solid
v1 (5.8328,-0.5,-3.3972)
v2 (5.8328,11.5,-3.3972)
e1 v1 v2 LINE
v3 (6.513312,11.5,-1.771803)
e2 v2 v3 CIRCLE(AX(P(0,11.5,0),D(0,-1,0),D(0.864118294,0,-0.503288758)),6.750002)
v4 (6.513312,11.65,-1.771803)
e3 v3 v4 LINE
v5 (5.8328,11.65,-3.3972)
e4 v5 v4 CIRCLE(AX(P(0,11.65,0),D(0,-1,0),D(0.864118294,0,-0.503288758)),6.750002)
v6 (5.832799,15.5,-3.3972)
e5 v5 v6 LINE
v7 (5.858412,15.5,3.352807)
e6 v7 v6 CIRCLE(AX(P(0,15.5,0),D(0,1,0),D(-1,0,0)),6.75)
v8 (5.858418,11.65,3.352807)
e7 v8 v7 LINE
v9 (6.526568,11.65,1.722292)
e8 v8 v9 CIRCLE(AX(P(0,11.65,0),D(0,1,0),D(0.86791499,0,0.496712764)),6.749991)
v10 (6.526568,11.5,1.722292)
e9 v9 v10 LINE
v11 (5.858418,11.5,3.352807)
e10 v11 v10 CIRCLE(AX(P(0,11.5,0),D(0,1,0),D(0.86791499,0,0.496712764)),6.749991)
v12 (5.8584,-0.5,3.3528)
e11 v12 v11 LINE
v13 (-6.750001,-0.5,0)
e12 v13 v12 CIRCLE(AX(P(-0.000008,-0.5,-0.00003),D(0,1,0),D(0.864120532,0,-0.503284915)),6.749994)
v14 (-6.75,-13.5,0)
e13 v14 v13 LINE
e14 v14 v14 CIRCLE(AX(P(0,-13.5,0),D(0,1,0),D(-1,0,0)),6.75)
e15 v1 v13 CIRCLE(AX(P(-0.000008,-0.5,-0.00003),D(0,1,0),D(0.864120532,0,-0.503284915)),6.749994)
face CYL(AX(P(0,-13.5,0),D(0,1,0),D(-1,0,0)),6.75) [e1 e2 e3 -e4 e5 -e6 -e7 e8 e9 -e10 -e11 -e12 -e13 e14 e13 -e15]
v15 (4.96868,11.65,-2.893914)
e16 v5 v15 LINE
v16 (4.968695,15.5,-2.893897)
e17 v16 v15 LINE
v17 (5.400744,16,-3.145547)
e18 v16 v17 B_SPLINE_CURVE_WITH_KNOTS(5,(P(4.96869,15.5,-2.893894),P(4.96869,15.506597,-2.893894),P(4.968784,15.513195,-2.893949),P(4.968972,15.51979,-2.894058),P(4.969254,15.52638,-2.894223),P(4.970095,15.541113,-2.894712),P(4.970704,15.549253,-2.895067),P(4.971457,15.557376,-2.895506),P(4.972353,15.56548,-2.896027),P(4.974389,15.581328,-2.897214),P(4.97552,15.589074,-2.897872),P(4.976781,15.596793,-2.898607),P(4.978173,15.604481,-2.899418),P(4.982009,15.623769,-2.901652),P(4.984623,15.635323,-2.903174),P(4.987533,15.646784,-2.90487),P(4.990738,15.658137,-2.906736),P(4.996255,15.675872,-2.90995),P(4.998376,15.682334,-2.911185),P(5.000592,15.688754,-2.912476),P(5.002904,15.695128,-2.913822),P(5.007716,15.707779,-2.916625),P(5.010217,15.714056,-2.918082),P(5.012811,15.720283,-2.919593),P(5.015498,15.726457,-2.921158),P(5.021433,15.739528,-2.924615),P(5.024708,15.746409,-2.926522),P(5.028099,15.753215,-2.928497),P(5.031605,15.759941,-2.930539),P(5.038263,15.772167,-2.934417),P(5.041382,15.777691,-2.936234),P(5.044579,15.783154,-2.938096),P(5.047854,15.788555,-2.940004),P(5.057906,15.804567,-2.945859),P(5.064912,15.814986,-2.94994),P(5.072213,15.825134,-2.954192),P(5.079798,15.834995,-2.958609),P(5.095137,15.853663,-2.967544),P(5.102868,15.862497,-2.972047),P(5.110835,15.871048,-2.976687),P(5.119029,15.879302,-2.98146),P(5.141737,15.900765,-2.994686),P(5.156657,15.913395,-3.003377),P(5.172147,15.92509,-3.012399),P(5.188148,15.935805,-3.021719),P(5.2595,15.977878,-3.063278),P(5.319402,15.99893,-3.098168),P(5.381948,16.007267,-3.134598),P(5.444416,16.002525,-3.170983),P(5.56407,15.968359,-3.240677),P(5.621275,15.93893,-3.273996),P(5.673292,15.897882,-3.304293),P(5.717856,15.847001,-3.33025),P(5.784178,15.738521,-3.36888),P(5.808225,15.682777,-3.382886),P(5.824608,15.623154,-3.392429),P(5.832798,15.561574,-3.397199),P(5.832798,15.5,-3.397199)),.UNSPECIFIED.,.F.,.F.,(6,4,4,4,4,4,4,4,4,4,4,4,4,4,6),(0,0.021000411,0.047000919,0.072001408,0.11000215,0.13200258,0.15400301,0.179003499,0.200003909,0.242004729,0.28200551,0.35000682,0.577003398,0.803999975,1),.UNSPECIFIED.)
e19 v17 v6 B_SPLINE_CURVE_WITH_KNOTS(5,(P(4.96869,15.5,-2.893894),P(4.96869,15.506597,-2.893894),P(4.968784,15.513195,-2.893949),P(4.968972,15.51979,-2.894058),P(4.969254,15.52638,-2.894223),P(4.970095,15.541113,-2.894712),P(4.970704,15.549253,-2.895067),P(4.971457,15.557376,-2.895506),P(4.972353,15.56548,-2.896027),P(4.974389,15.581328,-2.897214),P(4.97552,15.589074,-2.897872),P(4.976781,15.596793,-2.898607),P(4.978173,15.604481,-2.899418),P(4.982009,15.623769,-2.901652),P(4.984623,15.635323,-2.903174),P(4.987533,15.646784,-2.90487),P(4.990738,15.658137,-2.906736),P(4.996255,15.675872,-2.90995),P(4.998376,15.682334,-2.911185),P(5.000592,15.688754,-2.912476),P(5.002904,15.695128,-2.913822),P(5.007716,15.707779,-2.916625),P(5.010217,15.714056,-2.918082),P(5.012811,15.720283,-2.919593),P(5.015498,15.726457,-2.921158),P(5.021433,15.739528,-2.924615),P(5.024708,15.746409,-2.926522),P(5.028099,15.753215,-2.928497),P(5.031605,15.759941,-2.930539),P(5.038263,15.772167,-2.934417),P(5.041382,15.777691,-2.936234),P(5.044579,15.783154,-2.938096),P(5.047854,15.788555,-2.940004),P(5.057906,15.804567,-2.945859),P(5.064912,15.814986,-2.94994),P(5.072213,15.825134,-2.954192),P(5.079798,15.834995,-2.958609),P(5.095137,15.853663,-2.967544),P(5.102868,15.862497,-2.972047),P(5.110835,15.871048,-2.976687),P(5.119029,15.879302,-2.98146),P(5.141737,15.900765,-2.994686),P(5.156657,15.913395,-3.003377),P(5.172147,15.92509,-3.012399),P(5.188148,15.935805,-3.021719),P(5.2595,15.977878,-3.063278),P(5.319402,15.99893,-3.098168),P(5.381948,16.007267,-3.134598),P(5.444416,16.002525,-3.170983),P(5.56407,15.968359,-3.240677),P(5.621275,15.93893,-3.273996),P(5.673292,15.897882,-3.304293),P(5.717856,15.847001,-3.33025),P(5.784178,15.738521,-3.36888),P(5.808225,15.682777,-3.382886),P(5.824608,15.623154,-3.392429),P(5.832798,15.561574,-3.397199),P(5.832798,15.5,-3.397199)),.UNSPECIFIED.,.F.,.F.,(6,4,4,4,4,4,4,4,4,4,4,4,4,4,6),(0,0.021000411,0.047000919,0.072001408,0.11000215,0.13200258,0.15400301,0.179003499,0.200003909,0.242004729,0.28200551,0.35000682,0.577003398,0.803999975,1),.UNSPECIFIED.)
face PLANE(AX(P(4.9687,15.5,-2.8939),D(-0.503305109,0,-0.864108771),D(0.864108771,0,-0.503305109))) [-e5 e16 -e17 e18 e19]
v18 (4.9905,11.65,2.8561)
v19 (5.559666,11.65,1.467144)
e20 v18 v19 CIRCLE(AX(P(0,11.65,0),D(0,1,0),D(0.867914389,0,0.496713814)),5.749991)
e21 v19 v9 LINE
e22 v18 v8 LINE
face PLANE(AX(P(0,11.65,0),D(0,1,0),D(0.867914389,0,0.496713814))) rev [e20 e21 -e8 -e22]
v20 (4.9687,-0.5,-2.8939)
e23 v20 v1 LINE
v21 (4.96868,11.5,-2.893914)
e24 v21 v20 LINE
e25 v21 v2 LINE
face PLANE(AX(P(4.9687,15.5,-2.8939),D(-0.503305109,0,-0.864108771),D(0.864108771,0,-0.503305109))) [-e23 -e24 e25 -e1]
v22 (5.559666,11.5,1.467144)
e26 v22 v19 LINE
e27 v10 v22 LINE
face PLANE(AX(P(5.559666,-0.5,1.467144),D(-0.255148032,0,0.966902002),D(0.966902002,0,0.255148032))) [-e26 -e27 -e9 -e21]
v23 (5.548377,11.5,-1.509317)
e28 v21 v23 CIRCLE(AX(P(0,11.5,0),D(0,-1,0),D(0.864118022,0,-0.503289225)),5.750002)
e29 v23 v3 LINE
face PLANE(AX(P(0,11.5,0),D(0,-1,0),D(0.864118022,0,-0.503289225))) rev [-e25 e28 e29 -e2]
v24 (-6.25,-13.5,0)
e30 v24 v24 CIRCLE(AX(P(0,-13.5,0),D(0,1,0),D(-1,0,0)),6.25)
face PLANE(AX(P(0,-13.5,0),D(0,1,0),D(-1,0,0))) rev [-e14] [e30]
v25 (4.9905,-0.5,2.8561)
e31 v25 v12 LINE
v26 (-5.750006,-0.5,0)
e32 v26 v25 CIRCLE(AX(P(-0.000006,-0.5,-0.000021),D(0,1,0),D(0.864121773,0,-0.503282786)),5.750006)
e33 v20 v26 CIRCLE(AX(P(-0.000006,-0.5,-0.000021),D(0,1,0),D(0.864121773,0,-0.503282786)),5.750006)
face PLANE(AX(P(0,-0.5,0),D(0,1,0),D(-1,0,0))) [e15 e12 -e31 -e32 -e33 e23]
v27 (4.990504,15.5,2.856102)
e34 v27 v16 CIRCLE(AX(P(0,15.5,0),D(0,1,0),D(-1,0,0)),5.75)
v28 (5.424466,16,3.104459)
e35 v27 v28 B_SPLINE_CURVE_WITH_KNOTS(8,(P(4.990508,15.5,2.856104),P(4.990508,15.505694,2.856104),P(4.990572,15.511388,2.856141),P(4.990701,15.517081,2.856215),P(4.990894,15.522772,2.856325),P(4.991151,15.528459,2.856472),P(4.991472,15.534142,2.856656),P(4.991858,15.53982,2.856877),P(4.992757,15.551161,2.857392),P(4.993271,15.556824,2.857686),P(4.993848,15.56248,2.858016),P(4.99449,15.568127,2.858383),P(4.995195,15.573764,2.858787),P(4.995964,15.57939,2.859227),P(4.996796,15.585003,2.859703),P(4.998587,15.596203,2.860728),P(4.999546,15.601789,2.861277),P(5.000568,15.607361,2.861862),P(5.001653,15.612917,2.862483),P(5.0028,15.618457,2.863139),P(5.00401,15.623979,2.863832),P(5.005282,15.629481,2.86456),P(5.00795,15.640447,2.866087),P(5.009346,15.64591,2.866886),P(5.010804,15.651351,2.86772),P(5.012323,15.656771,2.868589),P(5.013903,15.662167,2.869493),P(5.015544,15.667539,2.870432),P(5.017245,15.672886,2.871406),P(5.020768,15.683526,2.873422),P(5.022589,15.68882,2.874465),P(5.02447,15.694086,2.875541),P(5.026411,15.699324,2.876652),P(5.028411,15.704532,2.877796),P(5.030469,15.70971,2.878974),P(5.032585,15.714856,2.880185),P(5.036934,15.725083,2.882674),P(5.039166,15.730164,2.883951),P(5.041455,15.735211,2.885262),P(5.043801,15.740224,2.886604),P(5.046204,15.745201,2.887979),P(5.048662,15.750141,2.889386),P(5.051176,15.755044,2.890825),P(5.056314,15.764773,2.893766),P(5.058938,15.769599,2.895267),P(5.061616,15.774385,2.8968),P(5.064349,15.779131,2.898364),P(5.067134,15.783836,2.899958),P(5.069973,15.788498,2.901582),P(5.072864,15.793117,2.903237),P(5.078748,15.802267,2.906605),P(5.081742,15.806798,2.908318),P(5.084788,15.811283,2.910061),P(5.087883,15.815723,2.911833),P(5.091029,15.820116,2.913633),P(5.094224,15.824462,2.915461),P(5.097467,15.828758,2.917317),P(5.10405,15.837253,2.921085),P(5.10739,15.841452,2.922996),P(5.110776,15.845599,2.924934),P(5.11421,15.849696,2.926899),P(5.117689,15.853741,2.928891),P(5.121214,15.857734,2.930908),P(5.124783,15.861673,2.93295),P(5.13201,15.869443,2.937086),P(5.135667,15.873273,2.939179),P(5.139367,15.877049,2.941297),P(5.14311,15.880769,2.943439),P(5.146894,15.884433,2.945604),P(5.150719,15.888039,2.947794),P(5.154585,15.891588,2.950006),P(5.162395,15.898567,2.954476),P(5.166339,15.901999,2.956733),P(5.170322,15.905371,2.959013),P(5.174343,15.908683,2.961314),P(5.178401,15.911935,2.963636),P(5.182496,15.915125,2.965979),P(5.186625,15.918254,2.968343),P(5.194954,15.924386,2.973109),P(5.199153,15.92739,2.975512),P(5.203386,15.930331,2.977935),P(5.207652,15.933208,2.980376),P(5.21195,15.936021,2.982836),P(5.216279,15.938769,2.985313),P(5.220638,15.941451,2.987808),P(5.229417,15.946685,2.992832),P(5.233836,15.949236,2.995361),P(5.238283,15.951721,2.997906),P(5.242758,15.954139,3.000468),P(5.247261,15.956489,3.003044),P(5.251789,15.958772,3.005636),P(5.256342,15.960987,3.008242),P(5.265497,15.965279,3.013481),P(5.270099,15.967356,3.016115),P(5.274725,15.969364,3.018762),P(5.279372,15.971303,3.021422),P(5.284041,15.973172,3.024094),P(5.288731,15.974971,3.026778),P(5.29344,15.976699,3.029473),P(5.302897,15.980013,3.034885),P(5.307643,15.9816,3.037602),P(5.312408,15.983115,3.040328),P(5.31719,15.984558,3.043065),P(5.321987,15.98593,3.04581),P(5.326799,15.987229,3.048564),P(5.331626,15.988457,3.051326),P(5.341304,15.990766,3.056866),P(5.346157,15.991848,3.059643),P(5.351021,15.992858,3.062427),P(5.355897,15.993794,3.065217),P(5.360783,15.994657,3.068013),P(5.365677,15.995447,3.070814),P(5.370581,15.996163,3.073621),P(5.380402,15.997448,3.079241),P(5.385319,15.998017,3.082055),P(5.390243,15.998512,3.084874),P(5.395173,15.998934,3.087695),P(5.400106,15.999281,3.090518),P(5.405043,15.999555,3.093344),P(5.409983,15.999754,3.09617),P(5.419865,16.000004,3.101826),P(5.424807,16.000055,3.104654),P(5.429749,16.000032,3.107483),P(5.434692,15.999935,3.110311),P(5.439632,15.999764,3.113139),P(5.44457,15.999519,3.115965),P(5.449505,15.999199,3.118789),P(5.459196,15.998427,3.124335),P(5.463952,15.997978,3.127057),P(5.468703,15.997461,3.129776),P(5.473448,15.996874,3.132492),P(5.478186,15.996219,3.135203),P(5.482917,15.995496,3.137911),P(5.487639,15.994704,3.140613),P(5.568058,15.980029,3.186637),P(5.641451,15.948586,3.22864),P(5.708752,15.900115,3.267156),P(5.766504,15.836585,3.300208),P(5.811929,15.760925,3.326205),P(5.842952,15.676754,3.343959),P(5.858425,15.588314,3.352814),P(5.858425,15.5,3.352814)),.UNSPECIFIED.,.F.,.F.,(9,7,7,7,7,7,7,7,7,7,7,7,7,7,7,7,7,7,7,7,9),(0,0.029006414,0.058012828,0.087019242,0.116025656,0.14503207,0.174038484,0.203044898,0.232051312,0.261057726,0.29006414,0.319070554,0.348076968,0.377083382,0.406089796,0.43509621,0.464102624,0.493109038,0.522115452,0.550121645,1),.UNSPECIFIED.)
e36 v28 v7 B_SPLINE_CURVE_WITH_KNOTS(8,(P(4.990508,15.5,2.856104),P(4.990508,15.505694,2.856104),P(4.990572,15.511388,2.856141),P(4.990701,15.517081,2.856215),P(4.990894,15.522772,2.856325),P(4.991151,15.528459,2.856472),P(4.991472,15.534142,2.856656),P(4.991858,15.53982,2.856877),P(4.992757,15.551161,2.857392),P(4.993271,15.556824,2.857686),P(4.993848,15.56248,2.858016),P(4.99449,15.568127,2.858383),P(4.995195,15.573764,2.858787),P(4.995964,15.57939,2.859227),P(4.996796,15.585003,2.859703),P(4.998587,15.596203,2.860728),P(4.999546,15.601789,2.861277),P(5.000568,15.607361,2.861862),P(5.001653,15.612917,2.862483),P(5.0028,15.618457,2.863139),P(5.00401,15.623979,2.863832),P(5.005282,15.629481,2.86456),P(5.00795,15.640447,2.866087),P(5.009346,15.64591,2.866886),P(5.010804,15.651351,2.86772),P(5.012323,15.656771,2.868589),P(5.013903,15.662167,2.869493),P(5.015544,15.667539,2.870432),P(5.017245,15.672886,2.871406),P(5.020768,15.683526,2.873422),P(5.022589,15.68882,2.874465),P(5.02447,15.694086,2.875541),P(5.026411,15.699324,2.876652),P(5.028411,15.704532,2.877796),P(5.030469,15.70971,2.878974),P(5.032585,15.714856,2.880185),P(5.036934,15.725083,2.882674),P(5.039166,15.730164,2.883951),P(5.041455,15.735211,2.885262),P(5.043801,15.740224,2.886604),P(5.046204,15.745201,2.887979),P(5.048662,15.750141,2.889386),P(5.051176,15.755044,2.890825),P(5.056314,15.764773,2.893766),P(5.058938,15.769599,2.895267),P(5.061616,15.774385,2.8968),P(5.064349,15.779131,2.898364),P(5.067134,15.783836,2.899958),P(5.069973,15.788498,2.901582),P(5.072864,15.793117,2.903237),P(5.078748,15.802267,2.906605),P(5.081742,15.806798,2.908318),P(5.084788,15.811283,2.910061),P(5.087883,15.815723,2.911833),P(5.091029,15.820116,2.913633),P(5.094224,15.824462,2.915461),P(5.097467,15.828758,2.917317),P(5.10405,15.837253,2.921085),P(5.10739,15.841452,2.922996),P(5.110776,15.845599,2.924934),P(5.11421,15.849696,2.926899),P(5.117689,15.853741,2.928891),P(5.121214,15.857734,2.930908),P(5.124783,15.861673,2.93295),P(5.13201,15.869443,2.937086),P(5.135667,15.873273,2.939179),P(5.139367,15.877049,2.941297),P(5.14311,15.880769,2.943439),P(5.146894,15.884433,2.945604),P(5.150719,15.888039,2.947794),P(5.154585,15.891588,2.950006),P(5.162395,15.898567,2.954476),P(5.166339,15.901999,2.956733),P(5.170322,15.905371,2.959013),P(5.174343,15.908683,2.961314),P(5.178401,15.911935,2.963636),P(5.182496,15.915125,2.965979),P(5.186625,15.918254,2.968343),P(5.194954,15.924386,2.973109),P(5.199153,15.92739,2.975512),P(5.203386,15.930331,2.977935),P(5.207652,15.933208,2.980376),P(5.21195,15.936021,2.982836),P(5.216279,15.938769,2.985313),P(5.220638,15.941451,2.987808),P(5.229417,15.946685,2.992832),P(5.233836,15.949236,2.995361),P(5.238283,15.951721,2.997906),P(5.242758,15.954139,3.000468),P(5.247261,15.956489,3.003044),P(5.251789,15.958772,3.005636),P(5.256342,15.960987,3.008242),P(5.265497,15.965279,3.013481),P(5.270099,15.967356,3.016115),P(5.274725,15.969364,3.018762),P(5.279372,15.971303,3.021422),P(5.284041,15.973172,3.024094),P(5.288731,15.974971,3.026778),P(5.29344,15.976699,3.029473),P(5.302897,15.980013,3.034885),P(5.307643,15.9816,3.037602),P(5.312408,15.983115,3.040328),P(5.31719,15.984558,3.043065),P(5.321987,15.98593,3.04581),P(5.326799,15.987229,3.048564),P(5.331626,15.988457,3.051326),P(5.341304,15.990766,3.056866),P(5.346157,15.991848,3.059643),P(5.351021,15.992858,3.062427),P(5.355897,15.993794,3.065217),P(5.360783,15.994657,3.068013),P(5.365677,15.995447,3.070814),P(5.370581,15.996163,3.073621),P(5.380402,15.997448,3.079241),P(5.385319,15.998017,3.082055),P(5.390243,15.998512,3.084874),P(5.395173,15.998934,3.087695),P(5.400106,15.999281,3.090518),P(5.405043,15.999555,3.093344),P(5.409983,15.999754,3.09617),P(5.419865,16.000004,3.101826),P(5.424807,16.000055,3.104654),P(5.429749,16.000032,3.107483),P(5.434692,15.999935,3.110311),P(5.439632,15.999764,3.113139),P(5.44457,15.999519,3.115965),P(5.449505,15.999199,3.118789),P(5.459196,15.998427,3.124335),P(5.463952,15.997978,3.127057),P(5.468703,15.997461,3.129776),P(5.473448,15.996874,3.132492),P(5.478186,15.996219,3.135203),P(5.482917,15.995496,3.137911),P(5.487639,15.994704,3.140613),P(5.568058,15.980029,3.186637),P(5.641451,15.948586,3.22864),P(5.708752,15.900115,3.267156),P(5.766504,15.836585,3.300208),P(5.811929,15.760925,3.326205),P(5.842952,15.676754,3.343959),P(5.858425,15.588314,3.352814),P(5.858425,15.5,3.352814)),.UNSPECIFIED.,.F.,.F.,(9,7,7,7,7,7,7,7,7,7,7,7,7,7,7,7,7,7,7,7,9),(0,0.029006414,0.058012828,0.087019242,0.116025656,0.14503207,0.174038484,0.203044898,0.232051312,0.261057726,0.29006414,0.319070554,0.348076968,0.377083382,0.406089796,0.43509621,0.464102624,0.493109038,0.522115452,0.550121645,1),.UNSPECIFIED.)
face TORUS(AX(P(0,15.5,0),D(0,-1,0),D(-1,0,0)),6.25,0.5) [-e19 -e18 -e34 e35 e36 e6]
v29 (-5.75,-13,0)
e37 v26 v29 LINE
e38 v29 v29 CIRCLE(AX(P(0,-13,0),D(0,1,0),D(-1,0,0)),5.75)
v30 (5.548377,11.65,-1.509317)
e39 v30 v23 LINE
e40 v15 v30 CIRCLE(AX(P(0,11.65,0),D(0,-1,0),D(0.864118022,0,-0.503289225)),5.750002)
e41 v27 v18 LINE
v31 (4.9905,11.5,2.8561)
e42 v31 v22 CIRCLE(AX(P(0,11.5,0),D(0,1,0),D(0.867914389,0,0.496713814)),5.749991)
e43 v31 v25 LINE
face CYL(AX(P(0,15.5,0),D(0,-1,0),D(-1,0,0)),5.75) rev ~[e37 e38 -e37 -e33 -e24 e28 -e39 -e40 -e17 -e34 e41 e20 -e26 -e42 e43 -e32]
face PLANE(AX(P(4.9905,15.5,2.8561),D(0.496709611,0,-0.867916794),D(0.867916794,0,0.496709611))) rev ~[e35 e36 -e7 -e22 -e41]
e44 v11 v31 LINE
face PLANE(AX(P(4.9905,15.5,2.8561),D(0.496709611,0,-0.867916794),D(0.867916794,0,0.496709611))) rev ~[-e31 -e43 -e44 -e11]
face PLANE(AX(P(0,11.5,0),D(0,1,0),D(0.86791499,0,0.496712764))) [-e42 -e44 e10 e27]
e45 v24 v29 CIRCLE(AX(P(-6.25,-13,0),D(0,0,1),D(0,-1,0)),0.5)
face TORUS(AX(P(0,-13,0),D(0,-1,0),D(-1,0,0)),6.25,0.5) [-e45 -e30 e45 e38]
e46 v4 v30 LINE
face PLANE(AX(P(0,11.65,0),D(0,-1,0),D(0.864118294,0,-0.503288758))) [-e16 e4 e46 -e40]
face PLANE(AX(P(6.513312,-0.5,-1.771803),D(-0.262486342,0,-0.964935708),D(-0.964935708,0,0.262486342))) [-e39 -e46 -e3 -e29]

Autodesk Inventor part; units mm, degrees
sketch "Sketch1" plane through (0, 0, 0) normal (0, 0, 1) x (1, 0, 0)
  line L0 (-6.25, -13.5) -> (-6.75, -13.5)
  line L1 (-6.75, -13.5) -> (-6.75, 15.5)
  line L2 (-6.25, 16) -> (-6.25, 16)
  line L3 (-5.75, 15.5) -> (-5.75, -13)
  arc A0 (-6.25, -13.5) -> (-5.75, -13) centre (-6.25, -13) ccw
  arc A1 (-6.25, 16) -> (-6.75, 15.5) centre (-6.25, 15.5) ccw
  arc A2 (-5.75, 15.5) -> (-6.25, 16) centre (-6.25, 15.5) ccw
  line L4 (0, -19.545) -> (0, 22.045) projected
  point P0 (-5.75, -13.5)
  point P1 (-6.75, 16)
  point P2 (0, 0)
  dimension "d2" = 29.5
  dimension "d3" = 1
  dimension "d4" = 5.75
  dimension "d5" = 13.5
  dimension "d6" = 0.5
revolve "Revolution1" add sketch "Sketch1" angle 360 about axis through (0, -10, 0) along (0, 1, 0)
ref_plane "Work Plane1" through (0, 15.5, 0) normal (0, 1, 0) x (-1, 0, 0)
sketch "Sketch3" plane through (0, 15.5, 0) normal (0, 1, 0) x (-1, 0, 0)
  circle A0 centre (0, 0) radius 6.75 construction
  circle A1 centre (0, 0) radius 5.75 construction
  arc A2 (-5.8328, -3.3972) -> (-5.8584, 3.3528) centre (0, 0) ccw
  arc A3 (-4.9687, -2.8939) -> (-4.9905, 2.8561) centre (0, 0) ccw
  line L0 (-0.0608, 0.0348) -> (-0.0605, -0.0352)
  line L1 (0, 0) -> (-0.0608, 0.0348)
  line L2 (-4.9905, 2.8561) -> (-5.8584, 3.3528)
  line L3 (0, 0) -> (-0.0605, -0.0352)
  line L4 (-4.9687, -2.8939) -> (-5.8328, -3.3972)
  point P0 (-0.0584, 6.7497)
  point P1 (-0.0071, -6.75)
  point P2 (-0.0546, 5.7497)
  point P3 (-0.0085, -5.75)
  dimension "d22" = 60
ref_plane "Work Plane3" through (5.8328, -0.5, -3.3972) normal (-0.5032861, 0, -0.8641199) x (-0.8641199, 0, 0.5032861)
sketch "Sketch4" plane through (5.8328, -0.5, -3.3972) normal (-0.5032861, 0, -0.8641199) x (-0.8641199, 0, 0.5032861)
  arc A0 (1, 16) -> (0, 16) centre (0.5, 16) ccw construction
  line L0 (0, 0) -> (0, 16) construction
  line L1 (1, 16) -> (1, 0) construction
  line L2 (0, 12.15) -> (1, 12.15)
  line L3 (1, 12.15) -> (1, 12)
  line L4 (1, 12) -> (0, 12)
  line L5 (0, 12) -> (0, 12.15)
  line L6 (6.75, -18.9) -> (6.75, 22.4) projected
  point P0 (6.75, 0.5)
  dimension "d14" = 1
  dimension "d15" = 0.15
  dimension "d16" = 4.5
revolve "Revolution2" cut sketch "Sketch4" angle 15 about axis through (0, -10, 0) along (0, -1, 0)
ref_plane "Work Plane2" through (4.9905, -0.5, 2.8561) normal (-0.4967067, 0, 0.8679184) x (0.8679184, 0, 0.4967067)
sketch "Sketch5" plane through (4.9905, -0.5, 2.8561) normal (-0.4967067, 0, 0.8679184) x (0.8679184, 0, 0.4967067)
  arc A0 (1, 16) -> (0, 16) centre (0.5, 16) ccw construction
  line L0 (0, 0) -> (0, 16) construction
  line L1 (1, 16) -> (1, 0) construction
  line L2 (0, 12.15) -> (1, 12.15)
  line L3 (1, 12.15) -> (1, 12)
  line L4 (1, 12) -> (0, 12)
  line L5 (0, 12) -> (0, 12.15)
  line L6 (6.75, -18.9) -> (6.75, 22.4)
  line L7 (-5.75, -27.16) -> (-5.75, 30.66) projected
  point P0 (-5.75, 0.5)
  point P1 (6.75, 0.5)
  dimension "d18" = 1
  dimension "d19" = 0.15
  dimension "d20" = 4.5
revolve "Revolution3" cut sketch "Sketch5" angle 15 about axis through (0, -10, 0) along (0, 1, 0)
extrude "Extrusion2" cut sketch "Sketch3" along normal blind 0.5 and the other way blind 16 contours L4 A3 L2 A2
properties part number "ConnectorSocket"
